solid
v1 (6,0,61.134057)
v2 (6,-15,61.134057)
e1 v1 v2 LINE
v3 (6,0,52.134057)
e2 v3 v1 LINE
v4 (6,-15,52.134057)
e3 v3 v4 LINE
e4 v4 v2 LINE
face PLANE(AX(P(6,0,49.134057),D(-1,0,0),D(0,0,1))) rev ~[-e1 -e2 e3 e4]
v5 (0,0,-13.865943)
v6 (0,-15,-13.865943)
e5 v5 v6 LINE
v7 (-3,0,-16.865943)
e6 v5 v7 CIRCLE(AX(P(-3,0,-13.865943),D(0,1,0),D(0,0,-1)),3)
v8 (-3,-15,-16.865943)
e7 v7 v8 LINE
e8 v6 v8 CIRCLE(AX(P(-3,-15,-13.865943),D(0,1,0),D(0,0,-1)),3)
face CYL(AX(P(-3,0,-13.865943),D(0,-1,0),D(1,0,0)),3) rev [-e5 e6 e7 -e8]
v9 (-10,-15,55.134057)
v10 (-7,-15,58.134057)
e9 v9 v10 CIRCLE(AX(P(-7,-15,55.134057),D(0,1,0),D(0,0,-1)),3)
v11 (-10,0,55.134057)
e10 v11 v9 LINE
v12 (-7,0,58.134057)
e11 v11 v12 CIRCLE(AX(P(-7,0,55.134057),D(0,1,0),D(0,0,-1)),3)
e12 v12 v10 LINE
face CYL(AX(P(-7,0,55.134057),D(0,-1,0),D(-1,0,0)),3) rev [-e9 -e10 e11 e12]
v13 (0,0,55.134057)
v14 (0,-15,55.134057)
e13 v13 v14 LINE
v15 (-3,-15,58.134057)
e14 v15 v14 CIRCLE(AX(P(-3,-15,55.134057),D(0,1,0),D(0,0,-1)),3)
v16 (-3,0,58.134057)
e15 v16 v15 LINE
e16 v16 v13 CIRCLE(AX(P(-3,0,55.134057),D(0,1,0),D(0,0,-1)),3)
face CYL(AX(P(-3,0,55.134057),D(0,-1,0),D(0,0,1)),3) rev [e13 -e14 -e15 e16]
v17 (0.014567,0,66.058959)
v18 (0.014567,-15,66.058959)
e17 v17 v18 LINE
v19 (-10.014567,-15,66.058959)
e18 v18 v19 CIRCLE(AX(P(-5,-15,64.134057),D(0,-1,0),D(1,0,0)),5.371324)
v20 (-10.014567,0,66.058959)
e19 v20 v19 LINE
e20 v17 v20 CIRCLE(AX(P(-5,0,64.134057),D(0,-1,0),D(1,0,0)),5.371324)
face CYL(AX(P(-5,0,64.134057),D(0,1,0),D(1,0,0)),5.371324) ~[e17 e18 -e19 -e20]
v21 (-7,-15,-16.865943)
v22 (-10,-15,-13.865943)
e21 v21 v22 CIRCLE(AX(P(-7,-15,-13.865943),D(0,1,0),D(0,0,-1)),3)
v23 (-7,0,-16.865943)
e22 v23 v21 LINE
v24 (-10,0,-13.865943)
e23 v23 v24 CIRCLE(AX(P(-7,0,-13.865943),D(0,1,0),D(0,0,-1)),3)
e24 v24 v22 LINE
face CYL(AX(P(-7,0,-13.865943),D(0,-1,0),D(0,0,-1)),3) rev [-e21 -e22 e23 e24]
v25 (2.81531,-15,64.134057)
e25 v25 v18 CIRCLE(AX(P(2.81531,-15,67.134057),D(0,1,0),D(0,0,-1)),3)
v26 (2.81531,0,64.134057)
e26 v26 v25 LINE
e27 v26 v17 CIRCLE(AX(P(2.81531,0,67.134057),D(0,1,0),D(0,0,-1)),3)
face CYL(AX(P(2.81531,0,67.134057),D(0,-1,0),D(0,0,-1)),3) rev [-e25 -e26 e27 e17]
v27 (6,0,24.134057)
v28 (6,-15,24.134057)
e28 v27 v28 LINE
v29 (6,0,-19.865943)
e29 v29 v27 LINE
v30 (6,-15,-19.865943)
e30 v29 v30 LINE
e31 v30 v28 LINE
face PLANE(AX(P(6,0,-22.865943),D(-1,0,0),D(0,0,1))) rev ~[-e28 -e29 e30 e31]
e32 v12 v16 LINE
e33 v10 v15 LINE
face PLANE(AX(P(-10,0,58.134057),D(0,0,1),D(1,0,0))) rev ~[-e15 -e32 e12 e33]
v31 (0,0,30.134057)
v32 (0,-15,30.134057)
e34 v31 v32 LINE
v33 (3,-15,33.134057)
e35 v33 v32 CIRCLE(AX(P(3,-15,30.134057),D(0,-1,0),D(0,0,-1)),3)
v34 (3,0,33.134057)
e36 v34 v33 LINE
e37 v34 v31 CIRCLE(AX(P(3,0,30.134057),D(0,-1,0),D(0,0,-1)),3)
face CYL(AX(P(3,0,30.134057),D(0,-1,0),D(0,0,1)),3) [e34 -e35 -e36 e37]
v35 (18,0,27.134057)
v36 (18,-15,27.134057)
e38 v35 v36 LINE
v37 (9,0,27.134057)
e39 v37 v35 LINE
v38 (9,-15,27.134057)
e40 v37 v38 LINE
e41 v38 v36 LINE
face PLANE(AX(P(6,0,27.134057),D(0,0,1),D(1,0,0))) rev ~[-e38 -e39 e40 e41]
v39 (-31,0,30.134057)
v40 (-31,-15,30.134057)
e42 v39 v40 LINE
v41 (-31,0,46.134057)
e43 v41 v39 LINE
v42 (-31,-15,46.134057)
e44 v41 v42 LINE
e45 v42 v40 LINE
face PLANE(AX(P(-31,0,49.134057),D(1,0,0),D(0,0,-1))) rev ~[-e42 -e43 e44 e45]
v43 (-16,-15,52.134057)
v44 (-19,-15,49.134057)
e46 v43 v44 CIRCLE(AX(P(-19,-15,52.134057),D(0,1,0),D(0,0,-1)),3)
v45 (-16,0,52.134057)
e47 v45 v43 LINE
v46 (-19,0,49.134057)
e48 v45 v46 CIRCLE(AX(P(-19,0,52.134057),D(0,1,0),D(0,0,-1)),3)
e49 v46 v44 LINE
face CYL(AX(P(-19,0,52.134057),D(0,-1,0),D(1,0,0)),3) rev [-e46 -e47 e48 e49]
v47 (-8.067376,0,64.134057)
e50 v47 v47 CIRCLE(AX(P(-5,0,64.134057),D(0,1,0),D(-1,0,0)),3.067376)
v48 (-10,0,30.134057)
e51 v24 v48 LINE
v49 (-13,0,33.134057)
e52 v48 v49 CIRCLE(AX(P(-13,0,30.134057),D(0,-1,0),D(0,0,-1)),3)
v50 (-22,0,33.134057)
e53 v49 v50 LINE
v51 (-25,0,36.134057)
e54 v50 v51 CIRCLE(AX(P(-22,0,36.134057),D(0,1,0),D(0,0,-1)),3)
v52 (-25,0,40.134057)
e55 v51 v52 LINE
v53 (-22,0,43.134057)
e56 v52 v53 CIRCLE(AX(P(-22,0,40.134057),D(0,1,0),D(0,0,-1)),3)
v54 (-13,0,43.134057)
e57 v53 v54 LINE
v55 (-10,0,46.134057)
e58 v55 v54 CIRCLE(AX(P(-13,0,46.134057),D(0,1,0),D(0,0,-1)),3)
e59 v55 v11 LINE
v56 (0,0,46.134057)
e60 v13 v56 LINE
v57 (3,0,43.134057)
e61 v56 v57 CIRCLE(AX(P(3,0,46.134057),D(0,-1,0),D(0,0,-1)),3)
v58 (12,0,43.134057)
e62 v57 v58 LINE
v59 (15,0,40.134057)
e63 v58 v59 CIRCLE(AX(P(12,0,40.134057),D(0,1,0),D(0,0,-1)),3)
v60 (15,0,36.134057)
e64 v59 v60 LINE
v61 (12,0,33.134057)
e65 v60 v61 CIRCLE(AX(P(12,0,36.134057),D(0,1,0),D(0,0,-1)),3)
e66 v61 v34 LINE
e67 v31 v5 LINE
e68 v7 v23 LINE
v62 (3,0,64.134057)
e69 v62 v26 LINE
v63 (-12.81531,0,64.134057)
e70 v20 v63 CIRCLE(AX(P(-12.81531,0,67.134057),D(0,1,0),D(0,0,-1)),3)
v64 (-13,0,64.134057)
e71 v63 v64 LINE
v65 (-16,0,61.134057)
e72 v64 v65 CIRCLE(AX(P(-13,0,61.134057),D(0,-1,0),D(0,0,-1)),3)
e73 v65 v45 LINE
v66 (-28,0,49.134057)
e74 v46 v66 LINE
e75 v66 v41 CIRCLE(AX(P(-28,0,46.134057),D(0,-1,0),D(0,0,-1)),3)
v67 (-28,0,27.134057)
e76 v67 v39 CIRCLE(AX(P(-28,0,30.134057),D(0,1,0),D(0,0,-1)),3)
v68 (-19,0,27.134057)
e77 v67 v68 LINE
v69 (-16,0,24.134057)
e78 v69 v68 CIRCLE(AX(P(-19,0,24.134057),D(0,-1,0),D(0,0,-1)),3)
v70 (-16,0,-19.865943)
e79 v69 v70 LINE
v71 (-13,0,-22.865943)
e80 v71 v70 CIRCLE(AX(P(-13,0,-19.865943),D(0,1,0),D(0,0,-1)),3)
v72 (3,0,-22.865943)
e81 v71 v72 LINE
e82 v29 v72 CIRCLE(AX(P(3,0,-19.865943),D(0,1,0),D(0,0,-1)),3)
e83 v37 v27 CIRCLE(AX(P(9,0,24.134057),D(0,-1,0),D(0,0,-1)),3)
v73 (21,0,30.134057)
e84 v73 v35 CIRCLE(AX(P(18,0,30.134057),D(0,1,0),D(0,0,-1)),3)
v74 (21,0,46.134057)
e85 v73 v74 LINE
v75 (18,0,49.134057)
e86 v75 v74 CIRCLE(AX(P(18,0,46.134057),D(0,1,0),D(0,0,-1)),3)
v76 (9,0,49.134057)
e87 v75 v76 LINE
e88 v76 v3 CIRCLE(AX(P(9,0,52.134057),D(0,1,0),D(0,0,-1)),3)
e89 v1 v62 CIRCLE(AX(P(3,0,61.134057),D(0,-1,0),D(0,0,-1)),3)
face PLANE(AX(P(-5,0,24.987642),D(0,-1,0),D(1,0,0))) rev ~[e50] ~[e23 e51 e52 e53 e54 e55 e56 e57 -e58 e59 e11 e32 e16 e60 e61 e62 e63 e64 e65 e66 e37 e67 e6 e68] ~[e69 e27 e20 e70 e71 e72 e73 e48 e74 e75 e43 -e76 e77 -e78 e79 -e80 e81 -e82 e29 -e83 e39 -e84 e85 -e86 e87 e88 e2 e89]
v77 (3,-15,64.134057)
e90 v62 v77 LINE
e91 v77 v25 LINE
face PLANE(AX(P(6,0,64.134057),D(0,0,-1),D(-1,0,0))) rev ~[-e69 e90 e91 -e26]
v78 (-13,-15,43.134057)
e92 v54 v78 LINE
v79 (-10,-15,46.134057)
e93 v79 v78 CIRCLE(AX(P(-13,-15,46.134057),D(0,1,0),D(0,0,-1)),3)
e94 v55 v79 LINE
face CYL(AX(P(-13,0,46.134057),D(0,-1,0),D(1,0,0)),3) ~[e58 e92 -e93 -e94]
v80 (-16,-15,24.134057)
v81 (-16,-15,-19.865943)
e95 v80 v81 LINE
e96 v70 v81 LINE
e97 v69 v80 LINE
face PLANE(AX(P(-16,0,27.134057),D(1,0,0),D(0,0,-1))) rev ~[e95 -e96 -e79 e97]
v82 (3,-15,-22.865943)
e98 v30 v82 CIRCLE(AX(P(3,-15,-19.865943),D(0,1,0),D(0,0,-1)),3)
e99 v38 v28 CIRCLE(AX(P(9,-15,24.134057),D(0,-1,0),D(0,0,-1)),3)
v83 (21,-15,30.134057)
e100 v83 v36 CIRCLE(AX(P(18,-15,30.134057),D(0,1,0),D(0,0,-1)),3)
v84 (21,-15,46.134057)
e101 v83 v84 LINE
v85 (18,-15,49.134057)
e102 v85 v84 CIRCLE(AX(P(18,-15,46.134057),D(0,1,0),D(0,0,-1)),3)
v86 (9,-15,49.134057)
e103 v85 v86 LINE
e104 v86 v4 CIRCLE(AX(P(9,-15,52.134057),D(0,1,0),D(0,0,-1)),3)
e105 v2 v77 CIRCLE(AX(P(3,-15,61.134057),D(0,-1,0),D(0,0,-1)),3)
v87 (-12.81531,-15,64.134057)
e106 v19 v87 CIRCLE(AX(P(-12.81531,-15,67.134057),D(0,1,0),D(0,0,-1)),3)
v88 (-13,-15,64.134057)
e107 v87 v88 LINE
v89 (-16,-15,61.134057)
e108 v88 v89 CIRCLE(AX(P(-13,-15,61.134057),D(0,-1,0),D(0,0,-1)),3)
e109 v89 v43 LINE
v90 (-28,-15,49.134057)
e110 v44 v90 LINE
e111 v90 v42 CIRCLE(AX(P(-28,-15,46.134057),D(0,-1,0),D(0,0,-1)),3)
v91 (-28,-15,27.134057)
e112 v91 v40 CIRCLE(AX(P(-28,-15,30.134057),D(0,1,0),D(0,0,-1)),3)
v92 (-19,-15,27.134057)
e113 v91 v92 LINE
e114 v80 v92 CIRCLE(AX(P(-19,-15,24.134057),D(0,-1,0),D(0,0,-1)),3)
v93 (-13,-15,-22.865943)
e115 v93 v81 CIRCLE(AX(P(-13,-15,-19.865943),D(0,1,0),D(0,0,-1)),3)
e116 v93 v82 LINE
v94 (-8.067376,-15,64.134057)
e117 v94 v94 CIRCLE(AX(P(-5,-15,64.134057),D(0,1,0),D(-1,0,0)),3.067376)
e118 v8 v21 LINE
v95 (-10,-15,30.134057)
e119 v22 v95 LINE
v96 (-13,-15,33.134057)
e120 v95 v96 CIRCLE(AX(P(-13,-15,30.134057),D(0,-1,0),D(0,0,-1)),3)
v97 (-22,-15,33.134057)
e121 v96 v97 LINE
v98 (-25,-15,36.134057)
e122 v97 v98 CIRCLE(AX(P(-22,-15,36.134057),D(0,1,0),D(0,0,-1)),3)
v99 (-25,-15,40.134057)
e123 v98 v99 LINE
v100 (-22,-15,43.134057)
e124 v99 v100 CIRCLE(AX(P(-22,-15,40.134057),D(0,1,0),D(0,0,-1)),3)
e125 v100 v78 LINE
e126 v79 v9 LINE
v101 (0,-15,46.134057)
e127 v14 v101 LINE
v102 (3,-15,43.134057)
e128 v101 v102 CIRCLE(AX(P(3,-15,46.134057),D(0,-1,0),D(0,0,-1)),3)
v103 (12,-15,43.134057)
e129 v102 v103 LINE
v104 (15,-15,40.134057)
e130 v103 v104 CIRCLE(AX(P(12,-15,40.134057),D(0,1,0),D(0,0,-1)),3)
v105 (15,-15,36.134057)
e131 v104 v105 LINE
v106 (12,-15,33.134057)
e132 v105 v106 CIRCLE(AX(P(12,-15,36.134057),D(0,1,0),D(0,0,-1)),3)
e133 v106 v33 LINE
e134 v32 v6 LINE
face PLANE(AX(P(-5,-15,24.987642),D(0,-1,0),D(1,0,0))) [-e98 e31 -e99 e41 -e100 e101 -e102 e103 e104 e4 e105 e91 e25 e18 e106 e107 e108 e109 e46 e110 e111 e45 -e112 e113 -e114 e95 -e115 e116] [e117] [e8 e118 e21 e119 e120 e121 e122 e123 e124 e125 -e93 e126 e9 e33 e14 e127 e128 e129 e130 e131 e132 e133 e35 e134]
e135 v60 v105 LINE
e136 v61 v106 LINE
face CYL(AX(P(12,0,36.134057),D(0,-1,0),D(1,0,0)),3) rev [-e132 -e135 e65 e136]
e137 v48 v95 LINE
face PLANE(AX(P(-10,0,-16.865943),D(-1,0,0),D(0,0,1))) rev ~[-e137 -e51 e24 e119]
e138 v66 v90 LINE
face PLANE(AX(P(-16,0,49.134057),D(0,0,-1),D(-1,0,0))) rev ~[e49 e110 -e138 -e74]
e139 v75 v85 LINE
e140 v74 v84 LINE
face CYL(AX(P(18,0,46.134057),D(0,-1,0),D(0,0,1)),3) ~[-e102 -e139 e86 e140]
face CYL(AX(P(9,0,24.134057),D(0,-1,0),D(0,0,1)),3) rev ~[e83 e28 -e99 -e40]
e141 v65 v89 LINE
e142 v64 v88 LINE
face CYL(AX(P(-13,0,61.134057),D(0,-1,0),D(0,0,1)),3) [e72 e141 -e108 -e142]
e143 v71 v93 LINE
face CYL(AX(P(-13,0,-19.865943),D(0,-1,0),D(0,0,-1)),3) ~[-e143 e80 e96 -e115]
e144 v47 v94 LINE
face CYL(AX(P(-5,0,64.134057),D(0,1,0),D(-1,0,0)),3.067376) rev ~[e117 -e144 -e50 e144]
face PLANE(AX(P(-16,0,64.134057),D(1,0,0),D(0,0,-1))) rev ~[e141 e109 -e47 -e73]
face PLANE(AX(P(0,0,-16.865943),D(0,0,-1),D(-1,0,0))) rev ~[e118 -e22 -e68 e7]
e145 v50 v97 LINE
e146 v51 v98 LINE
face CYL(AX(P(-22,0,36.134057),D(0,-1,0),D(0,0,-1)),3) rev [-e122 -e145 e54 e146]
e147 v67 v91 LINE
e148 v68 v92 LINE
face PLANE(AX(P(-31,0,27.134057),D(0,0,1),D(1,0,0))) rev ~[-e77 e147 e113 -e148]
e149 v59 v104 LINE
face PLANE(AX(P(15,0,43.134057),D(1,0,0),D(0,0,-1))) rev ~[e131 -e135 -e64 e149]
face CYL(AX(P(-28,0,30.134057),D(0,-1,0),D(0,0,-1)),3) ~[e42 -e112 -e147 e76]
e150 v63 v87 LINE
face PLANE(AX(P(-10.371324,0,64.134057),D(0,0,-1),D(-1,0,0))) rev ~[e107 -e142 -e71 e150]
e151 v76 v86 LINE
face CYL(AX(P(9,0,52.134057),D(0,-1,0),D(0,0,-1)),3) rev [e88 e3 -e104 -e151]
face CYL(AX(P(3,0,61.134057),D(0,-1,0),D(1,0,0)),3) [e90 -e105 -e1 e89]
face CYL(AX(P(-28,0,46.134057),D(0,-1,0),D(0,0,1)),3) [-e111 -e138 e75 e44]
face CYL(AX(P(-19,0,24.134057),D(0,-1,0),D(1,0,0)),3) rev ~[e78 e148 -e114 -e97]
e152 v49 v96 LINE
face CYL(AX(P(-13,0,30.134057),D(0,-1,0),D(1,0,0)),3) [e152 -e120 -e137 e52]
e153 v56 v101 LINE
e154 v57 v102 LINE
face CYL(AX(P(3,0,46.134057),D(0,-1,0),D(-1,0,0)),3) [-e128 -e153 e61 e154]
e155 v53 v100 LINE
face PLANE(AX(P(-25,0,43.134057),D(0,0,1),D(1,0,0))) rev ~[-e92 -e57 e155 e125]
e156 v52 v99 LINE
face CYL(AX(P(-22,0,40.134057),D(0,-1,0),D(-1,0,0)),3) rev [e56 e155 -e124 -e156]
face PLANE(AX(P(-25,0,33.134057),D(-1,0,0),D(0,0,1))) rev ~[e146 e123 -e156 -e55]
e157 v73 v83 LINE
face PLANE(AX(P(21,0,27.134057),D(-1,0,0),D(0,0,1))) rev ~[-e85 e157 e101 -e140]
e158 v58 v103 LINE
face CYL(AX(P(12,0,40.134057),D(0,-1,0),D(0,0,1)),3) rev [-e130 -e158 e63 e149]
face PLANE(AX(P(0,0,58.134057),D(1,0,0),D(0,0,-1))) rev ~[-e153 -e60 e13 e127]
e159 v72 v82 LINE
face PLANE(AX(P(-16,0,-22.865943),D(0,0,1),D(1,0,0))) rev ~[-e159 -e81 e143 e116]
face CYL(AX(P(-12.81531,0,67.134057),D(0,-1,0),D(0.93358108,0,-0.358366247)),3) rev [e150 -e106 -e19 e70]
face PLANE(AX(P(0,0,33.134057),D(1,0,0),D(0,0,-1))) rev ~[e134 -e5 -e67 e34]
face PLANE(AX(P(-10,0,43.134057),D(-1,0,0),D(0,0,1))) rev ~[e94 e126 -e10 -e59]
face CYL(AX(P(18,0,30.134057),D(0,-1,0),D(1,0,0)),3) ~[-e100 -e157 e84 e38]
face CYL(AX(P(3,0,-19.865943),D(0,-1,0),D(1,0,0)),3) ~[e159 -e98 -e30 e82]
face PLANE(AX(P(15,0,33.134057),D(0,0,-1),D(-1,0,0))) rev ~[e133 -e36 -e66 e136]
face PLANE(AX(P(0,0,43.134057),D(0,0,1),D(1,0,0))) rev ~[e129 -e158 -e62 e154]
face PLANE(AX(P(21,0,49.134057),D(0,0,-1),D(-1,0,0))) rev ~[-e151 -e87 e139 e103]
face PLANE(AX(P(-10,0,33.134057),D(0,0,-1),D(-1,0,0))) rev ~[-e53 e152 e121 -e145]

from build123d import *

# Parameters (mm, degrees)
F1_DEPTH = 15
F2_R     = 3
F3_R     = 3
F4_R     = 3


with BuildPart() as f1:
    # F0 (on Front) → F1 (new body)
    with BuildSketch(Plane.XZ):
        with BuildLine():
            Line((-16, 27.1340573728), (-16, -16.8659426272))
            Line((-16, -16.8659426272), (-16, -22.8659426272))
            Line((-16, -22.8659426272), (6, -22.8659426272))
            Line((6, -22.8659426272), (6, 27.1340573728))
            Line((6, 27.1340573728), (15, 27.1340573728))
            Line((15, 27.1340573728), (21, 27.1340573728))
            Line((21, 27.1340573728), (21, 49.1340573728))
            Line((21, 49.1340573728), (6, 49.1340573728))
            Line((6, 49.1340573728), (6, 64.1340573728))
            Line((6, 64.1340573728), (0.3713240896, 64.1340573728))
            ThreePointArc((0.3713240896, 64.1340573728), (-5, 58.7627332832), (-10.3713240896, 64.1340573728))
            Line((-10.3713240896, 64.1340573728), (-16, 64.1340573728))
            Line((-16, 64.1340573728), (-16, 49.1340573728))
            Line((-16, 49.1340573728), (-31, 49.1340573728))
            Line((-31, 49.1340573728), (-31, 27.1340573728))
            Line((-31, 27.1340573728), (-25, 27.1340573728))
            Line((-25, 27.1340573728), (-16, 27.1340573728))
        make_face()
        Polygon((-10, 58.1340573728), (0, 58.1340573728), (0, 43.1340573728), (15, 43.1340573728), (15, 33.1340573728), (0, 33.1340573728), (0, -16.8659426272), (-10, -16.8659426272), (-10, 33.1340573728), (-25, 33.1340573728), (-25, 43.1340573728), (-10, 43.1340573728), align=None, mode=Mode.SUBTRACT)
        with BuildLine():
            ThreePointArc((0.3713240896, 64.1340573728), (-5, 69.5053814624), (-10.3713240896, 64.1340573728))
            Line((-10.3713240896, 64.1340573728), (-8.0673756686, 64.1340573728))
            ThreePointArc((-8.0673756686, 64.1340573728), (-5, 67.2014330414), (-1.9326243314, 64.1340573728))
            Line((-1.9326243314, 64.1340573728), (0.3713240896, 64.1340573728))
        make_face()
        with BuildLine():
            Line((-8.0673756686, 64.1340573728), (-10.3713240896, 64.1340573728))
            ThreePointArc((-10.3713240896, 64.1340573728), (-5, 58.7627332832), (0.3713240896, 64.1340573728))
            Line((0.3713240896, 64.1340573728), (-1.9326243314, 64.1340573728))
            ThreePointArc((-1.9326243314, 64.1340573728), (-5, 61.0666817042), (-8.0673756686, 64.1340573728))
        make_face()
    extrude(amount=F1_DEPTH)

    # F2
    f2_edges = [f1.edges().sort_by_distance(p)[0] for p in [
        (-10, -7.5, -16.865943),
        (-10, -7.5, 33.134057),
        (-25, -7.5, 33.134057),
        (0, -7.5, -16.865943),
        (0, -7.5, 33.134057),
        (15, -7.5, 33.134057),
        (15, -7.5, 43.134057),
        (0, -7.5, 43.134057),
        (0, -7.5, 58.134057),
        (-10, -7.5, 58.134057),
        (-10, -7.5, 43.134057),
        (-25, -7.5, 43.134057),
    ]]
    fillet(f2_edges, radius=F2_R)

    # F3
    f3_edges = [f1.edges().sort_by_distance(p)[0] for p in [
        (6, -7.5, 49.134057),
    ]]
    fillet(f3_edges, radius=F3_R)

    # F4
    f4_edges = [f1.edges().sort_by_distance(p)[0] for p in [
        (6, -7.5, 64.134057),
        (0.371324, -7.5, 64.134057),
        (21, -7.5, 27.134057),
        (6, -7.5, 27.134057),
        (6, -7.5, -22.865943),
        (-16, -7.5, -22.865943),
        (-16, -7.5, 27.134057),
        (-31, -7.5, 27.134057),
        (-10.371324, -7.5, 64.134057),
        (-16, -7.5, 64.134057),
        (-16, -7.5, 49.134057),
        (21, -7.5, 49.134057),
        (-31, -7.5, 49.134057),
    ]]
    fillet(f4_edges, radius=F4_R)


solid = f1.part
